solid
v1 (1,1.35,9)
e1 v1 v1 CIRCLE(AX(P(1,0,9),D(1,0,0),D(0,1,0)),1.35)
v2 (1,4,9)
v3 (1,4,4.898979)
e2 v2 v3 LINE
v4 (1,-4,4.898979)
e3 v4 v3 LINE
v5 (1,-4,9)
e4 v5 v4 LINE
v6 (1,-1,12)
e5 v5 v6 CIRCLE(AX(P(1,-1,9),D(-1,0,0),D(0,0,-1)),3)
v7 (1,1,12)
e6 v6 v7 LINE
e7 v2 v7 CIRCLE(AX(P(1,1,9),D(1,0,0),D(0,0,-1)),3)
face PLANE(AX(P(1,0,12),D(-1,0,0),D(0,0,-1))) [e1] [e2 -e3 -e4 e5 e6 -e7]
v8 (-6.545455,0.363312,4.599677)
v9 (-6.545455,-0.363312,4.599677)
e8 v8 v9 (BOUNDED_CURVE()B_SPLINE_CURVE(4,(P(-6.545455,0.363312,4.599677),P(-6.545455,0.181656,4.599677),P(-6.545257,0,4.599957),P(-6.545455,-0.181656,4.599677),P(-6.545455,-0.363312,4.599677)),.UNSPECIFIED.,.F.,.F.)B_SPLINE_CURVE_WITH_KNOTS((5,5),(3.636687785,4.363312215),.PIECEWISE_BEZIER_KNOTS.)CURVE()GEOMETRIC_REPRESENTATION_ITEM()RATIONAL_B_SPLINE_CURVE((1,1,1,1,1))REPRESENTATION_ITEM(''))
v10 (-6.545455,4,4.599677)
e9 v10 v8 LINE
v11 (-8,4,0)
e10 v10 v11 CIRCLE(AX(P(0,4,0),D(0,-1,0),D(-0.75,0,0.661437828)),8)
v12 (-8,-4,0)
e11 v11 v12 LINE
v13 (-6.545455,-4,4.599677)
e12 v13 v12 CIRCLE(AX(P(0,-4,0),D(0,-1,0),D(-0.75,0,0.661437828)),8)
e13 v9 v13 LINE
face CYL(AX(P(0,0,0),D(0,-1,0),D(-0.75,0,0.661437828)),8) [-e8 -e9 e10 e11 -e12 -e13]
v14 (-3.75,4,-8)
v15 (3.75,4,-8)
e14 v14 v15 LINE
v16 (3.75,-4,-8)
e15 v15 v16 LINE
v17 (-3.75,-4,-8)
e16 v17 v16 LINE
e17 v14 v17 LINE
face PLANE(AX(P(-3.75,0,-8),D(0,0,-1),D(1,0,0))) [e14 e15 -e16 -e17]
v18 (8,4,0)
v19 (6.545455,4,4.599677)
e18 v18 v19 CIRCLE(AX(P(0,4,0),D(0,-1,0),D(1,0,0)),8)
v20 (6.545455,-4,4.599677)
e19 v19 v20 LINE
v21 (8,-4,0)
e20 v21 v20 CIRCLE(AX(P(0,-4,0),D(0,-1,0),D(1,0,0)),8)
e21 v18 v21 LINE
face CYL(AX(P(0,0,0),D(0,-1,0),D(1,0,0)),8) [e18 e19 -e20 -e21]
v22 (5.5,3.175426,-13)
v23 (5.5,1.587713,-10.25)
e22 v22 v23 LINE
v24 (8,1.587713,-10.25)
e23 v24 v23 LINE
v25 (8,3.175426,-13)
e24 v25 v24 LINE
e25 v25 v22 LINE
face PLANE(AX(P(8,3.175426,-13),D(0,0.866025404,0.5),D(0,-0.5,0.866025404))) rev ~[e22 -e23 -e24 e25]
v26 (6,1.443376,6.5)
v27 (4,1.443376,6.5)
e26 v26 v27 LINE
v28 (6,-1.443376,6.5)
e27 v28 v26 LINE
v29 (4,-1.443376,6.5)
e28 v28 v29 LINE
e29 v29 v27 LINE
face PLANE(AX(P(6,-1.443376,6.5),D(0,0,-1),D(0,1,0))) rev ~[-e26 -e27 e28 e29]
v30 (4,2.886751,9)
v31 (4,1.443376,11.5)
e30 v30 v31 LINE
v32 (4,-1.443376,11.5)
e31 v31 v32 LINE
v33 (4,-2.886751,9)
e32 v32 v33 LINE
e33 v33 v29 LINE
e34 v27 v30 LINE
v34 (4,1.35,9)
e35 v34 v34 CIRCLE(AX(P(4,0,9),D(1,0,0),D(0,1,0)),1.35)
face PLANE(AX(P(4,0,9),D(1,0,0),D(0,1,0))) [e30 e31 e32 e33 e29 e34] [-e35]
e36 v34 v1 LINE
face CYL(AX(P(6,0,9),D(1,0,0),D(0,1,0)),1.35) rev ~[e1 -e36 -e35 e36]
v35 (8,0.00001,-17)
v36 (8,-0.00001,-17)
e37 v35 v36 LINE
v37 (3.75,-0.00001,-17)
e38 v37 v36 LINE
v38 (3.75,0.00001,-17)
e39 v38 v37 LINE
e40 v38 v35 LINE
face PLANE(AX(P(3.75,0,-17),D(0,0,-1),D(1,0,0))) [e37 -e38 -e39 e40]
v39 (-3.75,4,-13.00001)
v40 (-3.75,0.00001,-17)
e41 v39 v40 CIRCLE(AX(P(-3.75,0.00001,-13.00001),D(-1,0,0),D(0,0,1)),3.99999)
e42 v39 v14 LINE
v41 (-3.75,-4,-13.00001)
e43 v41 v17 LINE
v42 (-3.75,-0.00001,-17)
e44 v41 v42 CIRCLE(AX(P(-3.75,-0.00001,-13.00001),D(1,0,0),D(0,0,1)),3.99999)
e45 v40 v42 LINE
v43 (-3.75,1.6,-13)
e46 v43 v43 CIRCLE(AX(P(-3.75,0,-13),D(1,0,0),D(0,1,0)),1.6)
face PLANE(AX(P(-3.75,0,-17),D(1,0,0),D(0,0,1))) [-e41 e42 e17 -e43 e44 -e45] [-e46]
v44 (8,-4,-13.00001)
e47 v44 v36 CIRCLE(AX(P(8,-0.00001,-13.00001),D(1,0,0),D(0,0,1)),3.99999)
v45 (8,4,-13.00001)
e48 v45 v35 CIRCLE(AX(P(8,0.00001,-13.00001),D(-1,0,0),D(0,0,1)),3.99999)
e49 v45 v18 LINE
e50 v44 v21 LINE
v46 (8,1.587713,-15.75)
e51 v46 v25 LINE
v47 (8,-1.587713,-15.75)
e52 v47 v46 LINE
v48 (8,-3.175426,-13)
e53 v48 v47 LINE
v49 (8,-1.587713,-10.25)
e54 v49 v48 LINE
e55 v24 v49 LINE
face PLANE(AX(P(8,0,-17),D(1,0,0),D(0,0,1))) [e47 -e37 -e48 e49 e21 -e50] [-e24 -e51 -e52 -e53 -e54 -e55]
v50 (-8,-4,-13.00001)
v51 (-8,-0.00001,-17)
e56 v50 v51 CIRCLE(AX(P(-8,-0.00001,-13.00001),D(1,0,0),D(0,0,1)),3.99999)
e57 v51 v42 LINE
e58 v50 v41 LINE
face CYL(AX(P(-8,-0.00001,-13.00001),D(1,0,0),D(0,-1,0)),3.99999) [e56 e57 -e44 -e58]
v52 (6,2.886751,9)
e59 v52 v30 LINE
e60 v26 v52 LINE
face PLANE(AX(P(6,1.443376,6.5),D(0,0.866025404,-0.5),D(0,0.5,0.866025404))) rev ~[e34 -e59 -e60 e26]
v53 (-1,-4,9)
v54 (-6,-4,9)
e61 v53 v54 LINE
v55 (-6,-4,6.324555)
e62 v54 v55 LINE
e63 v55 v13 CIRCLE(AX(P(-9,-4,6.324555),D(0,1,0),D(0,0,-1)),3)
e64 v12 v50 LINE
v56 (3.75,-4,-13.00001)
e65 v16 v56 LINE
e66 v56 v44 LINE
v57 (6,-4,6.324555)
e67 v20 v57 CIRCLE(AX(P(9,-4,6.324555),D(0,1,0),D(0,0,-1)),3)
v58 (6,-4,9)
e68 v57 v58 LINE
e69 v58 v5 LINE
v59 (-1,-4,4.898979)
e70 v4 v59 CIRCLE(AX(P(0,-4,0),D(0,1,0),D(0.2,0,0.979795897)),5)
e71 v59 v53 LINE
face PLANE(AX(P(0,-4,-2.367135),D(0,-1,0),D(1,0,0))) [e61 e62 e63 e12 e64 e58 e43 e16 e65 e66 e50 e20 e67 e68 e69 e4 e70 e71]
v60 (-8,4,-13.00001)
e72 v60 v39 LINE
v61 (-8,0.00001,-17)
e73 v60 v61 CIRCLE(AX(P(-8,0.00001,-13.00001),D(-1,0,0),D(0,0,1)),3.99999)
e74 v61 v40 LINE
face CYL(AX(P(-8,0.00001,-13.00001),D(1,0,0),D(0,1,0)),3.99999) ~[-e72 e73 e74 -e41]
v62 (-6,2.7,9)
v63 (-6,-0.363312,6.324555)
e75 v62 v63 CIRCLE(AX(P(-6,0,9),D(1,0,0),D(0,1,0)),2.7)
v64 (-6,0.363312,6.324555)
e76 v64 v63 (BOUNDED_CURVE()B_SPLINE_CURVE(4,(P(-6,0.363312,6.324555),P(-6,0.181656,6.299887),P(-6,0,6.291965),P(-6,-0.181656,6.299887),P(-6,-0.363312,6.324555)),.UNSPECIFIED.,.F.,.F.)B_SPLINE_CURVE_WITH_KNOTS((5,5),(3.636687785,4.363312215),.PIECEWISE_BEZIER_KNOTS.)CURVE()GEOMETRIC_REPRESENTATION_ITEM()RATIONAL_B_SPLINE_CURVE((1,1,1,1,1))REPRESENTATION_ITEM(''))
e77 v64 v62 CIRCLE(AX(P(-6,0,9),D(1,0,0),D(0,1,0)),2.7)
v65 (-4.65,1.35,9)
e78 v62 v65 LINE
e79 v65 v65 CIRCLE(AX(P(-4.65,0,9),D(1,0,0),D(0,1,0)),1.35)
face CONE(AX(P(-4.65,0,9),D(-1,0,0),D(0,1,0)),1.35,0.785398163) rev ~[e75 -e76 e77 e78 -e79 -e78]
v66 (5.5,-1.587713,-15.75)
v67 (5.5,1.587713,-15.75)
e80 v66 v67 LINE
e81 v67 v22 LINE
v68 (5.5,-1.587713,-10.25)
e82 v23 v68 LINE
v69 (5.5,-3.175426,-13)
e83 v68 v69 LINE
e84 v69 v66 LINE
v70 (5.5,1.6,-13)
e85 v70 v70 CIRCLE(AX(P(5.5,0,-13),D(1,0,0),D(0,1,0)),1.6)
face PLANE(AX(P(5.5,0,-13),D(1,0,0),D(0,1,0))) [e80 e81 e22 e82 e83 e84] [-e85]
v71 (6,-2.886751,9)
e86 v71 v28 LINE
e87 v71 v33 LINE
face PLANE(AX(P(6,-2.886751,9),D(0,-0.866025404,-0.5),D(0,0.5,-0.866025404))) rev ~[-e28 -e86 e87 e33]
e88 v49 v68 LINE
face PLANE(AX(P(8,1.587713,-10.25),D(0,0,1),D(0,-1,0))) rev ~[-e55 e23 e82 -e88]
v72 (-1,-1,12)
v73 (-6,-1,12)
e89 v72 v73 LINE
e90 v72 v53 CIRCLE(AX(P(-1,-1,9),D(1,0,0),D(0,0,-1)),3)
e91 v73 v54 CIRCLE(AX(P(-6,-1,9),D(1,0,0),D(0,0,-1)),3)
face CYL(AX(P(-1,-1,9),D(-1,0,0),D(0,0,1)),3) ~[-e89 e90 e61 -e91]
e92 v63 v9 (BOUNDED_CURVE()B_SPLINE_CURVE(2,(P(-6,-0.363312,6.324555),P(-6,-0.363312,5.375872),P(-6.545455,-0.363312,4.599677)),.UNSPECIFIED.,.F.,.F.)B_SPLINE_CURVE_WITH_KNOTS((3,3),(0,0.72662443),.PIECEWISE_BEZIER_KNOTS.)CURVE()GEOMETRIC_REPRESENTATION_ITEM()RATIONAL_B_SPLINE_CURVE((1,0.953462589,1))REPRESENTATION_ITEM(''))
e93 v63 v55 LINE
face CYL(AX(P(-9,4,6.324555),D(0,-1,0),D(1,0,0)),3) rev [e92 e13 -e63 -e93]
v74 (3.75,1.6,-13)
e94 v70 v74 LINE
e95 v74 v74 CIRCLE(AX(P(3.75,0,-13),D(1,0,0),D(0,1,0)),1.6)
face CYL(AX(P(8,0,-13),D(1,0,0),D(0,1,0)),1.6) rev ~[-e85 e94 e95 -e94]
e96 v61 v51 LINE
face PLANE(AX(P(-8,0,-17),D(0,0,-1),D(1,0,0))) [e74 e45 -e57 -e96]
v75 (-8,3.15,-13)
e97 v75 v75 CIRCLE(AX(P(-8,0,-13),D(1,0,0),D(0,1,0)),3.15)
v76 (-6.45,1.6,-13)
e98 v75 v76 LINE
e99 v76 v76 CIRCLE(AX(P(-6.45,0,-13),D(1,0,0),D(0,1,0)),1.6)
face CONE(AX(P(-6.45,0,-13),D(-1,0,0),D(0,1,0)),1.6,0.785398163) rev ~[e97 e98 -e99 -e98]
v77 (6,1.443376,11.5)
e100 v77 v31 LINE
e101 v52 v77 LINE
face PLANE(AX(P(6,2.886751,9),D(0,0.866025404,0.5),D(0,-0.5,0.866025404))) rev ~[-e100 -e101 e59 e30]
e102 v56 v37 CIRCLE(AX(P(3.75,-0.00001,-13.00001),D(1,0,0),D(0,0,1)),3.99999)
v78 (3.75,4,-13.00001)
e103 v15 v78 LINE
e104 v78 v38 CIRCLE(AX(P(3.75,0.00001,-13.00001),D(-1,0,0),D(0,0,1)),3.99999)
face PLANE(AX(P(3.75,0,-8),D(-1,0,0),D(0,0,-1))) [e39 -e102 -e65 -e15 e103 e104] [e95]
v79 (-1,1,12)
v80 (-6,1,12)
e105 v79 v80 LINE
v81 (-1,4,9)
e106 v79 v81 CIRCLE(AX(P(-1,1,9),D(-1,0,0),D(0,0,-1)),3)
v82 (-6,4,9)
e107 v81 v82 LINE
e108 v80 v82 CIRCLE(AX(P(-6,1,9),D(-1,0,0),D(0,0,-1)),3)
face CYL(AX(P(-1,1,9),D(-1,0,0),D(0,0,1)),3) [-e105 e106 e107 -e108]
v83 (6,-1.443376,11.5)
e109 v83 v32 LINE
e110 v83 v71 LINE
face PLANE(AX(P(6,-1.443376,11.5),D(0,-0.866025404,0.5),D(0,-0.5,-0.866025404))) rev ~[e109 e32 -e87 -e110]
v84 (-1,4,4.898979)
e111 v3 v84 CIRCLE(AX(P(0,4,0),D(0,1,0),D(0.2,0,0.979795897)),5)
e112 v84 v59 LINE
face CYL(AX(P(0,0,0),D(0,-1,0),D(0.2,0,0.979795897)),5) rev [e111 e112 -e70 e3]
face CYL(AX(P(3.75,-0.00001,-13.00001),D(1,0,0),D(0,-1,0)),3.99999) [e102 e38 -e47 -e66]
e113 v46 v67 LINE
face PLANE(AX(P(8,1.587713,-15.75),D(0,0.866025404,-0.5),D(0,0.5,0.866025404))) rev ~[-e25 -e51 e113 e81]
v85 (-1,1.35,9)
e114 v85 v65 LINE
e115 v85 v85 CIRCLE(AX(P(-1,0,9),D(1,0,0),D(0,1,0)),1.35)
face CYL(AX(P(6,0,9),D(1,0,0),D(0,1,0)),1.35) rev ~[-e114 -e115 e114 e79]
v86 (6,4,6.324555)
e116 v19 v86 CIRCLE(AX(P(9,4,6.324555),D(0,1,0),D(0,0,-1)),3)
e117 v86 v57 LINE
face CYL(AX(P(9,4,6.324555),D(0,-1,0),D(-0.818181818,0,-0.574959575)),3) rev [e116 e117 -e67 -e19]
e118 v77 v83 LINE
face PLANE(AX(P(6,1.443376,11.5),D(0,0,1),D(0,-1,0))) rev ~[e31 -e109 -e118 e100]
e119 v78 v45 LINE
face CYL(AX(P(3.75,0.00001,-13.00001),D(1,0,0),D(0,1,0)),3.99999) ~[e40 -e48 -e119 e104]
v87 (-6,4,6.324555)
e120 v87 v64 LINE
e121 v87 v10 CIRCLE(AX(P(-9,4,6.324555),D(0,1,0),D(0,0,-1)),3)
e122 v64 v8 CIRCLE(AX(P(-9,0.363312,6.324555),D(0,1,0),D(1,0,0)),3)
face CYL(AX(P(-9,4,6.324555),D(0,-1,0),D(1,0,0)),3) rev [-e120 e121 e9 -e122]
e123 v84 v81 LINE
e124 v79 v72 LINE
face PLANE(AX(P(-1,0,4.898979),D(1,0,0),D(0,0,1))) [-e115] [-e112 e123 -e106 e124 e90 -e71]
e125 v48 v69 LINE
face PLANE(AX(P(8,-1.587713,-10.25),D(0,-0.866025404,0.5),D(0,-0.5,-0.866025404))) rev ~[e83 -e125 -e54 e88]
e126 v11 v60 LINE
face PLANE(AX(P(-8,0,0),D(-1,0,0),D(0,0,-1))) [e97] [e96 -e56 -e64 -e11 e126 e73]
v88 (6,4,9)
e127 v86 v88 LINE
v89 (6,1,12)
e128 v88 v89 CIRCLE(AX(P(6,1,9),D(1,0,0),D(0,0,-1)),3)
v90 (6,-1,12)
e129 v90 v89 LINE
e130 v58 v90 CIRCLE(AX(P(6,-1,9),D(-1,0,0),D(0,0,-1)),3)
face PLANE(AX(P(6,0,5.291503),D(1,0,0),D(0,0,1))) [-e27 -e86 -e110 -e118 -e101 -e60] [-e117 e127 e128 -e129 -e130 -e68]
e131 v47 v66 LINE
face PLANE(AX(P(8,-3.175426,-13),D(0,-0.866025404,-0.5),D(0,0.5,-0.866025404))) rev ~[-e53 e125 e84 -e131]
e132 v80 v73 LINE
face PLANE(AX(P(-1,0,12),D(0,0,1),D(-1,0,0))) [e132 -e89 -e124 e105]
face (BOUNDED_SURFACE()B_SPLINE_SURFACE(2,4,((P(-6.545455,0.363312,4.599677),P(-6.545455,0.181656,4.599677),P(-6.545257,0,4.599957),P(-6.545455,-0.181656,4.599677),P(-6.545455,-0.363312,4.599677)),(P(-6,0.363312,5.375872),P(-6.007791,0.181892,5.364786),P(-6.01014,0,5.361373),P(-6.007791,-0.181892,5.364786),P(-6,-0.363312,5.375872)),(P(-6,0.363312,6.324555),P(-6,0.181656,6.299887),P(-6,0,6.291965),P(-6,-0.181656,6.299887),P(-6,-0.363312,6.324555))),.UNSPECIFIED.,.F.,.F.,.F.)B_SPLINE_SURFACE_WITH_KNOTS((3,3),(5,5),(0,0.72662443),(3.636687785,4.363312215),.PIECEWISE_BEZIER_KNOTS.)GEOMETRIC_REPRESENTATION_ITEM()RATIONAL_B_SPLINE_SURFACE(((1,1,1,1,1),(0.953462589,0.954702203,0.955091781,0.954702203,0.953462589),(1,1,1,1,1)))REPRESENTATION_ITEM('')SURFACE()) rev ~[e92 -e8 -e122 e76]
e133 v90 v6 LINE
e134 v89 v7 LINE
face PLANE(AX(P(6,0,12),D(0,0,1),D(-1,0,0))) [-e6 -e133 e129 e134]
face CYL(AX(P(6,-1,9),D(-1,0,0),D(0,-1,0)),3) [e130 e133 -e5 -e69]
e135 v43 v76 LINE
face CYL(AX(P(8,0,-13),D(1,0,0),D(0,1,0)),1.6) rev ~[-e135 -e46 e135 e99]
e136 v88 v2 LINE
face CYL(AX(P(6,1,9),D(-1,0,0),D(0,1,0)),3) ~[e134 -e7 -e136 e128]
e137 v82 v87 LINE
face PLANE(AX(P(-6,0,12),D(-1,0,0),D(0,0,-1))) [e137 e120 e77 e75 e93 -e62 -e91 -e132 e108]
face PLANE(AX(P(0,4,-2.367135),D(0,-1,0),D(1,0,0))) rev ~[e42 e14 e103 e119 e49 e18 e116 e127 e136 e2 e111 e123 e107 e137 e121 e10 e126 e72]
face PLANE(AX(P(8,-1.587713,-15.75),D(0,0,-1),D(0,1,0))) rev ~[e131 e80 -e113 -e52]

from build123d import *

# Parameters (mm, degrees)
F1_DEPTH = 4
F2_R     = 1.35
F3_DEPTH = 14.001
F4_DEPTH = 2
F5_R     = 1.6
F6_DEPTH = 25
F7_DEPTH = 2.5
F8_SIZE  = 1.35
F9_R     = 3
F10_R    = 3.99999
F11_SIZE = 1.55


# Not quite as in the source:
# - a fillet or chamfer is up to 0.001 mm smaller than in the source, because OpenCascade refuses the exact size
# - a feature names something its author has since deleted; it is built from what else it names


with BuildPart() as f1:
    # F0 (on Front) → F1 (new body, symmetric)
    with BuildSketch(Plane.XZ):
        with BuildLine():
            ThreePointArc((1, 4.8989794856), (0, -5), (-1, 4.8989794856))
            Line((-1, 4.8989794856), (-1, 12))
            Line((-1, 12), (-6, 12))
            Line((-6, 12), (-6, 5.2915026221))
            ThreePointArc((-6, 5.2915026221), (-7.4833147735, 2.8284271247), (-8, 0))
            Line((-8, 0), (-8, -17))
            Line((-8, -17), (-3.75, -17))
            Line((-3.75, -17), (-3.75, -8))
            Line((-3.75, -8), (3.75, -8))
            Line((3.75, -8), (3.75, -17))
            Line((3.75, -17), (8, -17))
            Line((8, -17), (8, 0))
            ThreePointArc((8, 0), (7.4833147735, 2.8284271247), (6, 5.2915026221))
            Line((6, 5.2915026221), (6, 12))
            Line((6, 12), (1, 12))
            Line((1, 12), (1, 4.8989794856))
        make_face()
    extrude(amount=F1_DEPTH, both=True)

    # F2 (on face) → F3 (cut, through all)
    with BuildSketch(Plane.YZ.offset(6)):
        with Locations((0, 9)):
            Circle(F2_R)
    extrude(amount=-F3_DEPTH, mode=Mode.SUBTRACT)

    # F2 (on face) → F4 (cut)
    with BuildSketch(Plane.YZ.offset(6)):
        Polygon((2.8867513459, 9), (1.443375673, 11.5), (-1.443375673, 11.5), (-2.8867513459, 9), (-1.443375673, 6.5), (1.443375673, 6.5), align=None)
        with Locations((0, 9)):
            Circle(F2_R, mode=Mode.SUBTRACT)
    extrude(amount=-F4_DEPTH, mode=Mode.SUBTRACT)

    # F5 (on face) → F6 (cut)
    with BuildSketch(Plane.YZ.offset(8)):
        with Locations((0, -13)):
            Circle(F5_R)
    extrude(amount=-F6_DEPTH, mode=Mode.SUBTRACT)

    # F5 (on face) → F7 (cut)
    with BuildSketch(Plane.YZ.offset(8)):
        Polygon((1.5877132403, -10.25), (-1.5877132403, -10.25), (-3.1754264805, -13), (-1.5877132403, -15.75), (1.5877132403, -15.75), (3.1754264805, -13), align=None)
        with Locations((0, -13)):
            Circle(F5_R, mode=Mode.SUBTRACT)
    extrude(amount=-F7_DEPTH, mode=Mode.SUBTRACT)

    # F8
    f8_edges = [f1.edges().sort_by_distance(p)[0] for p in [
        (-6, -1.35, 9),
    ]]
    chamfer(f8_edges, length=F8_SIZE)

    # F9
    f9_edges = [f1.edges().sort_by_distance(p)[0] for p in [
        (-3.5, -4, 12),
        (3.5, -4, 12),
        (3.5, 4, 12),
        (-3.5, 4, 12),
        (6, 0, 5.291503),
        (-6, 0, 5.291503),
    ]]
    fillet(f9_edges, radius=F9_R)

    # F10 (radius 4 in the source; OpenCascade refuses exactly that, so slightly less here)
    f10_edges = [f1.edges().sort_by_distance(p)[0] for p in [
        (5.875, -4, -17),
        (-5.875, -4, -17),
        (-5.875, 4, -17),
        (5.875, 4, -17),
    ]]
    fillet(f10_edges, radius=F10_R)

    # F11
    f11_edges = [f1.edges().sort_by_distance(p)[0] for p in [
        (-8, -1.6, -13),
    ]]
    chamfer(f11_edges, length=F11_SIZE)


solid = f1.part
